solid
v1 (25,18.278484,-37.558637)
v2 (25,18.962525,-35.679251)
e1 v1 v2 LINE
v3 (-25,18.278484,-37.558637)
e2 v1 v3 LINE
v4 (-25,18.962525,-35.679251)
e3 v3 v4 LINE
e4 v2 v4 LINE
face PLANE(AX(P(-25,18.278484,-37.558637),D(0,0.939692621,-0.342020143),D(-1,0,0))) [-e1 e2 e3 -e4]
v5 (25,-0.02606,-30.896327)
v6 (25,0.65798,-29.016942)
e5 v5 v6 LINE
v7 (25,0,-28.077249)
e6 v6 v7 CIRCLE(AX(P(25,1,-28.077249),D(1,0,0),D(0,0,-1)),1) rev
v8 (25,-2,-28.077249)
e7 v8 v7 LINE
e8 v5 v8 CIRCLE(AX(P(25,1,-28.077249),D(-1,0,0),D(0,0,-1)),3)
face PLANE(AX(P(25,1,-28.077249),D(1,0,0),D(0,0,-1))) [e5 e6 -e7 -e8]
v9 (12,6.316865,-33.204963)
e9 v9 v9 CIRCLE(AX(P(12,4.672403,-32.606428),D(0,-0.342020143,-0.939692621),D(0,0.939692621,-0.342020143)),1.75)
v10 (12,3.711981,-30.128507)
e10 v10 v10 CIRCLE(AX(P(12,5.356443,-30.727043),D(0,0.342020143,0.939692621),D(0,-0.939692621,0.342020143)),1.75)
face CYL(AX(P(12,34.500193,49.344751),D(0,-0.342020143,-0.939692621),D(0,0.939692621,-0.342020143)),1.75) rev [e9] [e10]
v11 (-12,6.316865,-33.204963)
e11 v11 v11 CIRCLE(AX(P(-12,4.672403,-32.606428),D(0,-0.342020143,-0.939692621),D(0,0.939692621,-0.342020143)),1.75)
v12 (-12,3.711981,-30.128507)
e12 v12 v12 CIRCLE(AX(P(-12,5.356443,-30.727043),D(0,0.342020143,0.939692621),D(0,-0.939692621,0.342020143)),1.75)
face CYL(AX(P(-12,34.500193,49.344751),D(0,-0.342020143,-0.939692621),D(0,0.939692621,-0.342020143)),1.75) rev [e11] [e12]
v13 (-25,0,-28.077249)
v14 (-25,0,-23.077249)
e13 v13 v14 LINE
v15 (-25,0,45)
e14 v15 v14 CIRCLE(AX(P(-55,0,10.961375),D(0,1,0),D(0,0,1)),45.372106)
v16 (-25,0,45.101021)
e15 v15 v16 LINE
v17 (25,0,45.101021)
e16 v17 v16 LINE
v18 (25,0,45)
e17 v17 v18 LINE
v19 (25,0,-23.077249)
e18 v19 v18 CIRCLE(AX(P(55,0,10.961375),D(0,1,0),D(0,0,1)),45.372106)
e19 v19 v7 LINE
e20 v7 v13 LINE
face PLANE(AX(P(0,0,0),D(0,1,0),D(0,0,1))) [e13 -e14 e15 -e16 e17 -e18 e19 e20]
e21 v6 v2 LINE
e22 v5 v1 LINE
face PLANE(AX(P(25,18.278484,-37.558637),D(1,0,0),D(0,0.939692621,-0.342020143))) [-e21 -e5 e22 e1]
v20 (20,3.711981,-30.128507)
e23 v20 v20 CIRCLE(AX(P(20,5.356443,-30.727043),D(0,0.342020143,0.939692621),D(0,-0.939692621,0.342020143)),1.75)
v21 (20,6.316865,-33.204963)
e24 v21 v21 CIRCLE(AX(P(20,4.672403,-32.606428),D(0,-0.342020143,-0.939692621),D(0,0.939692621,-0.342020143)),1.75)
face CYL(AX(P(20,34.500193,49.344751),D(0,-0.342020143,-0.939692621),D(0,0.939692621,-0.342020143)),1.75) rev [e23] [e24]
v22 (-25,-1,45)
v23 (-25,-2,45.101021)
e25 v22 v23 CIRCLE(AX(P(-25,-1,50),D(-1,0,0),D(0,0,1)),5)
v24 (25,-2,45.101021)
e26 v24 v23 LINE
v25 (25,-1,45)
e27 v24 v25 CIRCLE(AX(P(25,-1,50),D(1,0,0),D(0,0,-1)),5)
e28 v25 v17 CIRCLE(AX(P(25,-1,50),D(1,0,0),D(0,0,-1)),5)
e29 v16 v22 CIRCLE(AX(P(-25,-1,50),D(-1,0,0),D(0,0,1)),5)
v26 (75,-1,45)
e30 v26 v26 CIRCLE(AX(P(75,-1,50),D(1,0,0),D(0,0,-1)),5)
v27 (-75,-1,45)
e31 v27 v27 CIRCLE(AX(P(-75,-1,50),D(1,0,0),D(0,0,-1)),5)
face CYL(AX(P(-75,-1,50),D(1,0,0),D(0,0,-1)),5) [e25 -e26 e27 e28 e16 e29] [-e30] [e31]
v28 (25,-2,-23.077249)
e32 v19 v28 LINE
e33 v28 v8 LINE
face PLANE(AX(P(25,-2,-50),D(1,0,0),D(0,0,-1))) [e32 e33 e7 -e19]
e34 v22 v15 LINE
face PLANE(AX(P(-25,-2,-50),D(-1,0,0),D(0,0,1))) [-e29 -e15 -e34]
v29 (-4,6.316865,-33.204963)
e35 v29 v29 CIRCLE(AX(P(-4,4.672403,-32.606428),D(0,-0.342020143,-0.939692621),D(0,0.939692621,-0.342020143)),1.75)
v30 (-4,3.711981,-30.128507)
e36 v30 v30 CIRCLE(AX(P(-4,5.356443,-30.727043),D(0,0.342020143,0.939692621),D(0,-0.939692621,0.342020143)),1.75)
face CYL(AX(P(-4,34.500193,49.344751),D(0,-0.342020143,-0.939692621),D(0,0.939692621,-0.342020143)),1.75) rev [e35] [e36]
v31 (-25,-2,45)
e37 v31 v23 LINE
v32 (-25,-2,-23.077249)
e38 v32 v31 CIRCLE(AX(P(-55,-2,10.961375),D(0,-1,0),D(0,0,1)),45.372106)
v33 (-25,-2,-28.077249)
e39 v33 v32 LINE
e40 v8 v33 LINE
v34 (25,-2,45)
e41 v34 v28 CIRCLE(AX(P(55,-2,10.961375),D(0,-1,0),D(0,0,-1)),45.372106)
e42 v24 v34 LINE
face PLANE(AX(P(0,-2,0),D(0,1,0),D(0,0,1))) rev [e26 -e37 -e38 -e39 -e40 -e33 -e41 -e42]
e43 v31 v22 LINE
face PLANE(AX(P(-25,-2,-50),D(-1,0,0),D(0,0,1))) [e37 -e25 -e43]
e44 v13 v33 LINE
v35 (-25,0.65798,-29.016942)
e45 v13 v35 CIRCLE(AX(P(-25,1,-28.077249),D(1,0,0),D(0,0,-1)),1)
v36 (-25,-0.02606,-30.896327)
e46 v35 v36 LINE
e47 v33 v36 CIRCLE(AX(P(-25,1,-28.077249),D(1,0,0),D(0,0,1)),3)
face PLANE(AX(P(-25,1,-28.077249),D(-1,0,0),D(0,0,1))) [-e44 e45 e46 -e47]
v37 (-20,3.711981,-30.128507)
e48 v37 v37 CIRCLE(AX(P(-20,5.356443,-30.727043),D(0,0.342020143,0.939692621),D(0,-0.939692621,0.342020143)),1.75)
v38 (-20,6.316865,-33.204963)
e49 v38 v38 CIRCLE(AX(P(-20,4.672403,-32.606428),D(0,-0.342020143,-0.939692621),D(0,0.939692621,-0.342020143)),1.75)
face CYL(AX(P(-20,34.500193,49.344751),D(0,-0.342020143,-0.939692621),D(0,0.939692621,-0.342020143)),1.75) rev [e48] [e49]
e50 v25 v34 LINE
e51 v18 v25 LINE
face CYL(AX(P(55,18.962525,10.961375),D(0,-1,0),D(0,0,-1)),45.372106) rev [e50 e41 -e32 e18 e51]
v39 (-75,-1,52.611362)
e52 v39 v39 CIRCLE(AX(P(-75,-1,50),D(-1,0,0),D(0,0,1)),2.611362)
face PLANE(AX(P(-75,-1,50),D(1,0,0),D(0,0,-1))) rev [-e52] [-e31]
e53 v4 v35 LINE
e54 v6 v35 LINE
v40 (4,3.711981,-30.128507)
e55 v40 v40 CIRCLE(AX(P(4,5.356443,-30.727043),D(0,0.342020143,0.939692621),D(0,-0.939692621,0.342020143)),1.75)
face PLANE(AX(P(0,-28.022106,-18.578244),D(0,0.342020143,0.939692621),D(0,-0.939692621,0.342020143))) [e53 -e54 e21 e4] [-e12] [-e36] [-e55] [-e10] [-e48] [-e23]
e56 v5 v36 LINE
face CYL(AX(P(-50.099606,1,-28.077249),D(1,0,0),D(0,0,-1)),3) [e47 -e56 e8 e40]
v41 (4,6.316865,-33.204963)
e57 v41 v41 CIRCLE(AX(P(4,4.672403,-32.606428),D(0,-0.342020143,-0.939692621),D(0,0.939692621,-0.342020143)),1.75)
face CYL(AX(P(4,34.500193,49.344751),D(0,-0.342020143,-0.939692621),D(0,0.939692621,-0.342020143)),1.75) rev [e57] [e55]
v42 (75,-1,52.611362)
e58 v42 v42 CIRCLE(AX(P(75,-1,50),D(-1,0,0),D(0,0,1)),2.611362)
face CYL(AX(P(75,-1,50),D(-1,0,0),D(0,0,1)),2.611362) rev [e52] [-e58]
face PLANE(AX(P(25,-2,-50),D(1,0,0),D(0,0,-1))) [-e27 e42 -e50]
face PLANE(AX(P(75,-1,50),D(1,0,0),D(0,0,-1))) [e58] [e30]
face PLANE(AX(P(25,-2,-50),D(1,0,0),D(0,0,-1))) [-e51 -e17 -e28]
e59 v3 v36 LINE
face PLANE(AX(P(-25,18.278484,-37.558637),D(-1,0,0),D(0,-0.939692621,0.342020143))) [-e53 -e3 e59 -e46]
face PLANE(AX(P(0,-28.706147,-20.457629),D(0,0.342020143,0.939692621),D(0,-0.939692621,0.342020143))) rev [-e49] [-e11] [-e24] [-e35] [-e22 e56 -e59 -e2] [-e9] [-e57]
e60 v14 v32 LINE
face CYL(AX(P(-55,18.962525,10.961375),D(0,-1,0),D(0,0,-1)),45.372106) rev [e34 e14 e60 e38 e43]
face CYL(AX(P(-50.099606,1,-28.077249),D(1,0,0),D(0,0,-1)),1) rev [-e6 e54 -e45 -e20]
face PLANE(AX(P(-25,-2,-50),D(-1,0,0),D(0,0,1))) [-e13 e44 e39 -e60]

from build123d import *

# Parameters (mm, degrees)
SKETCH1_W                = 50
SKETCH1_H                = 100
BASE_FLANGE1_DEPTH       = 2
SKETCHED_START           = -25
SKETCHED_BEND1_DEPTH     = 50
SKETCHED_BEND1_2_DEPTH   = 50
CUT_EXTRUDE2_DEPTH       = 60.702826072
BOSS_EXTRUDE2_DEPTH      = 75
BOSS_EXTRUDE2_DEPTH_BACK = 75
SKETCH9_R                = 5
SKETCH10_R               = 1.75
CUT_EXTRUDE3_DEPTH       = 116.029027735
SKETCH11_R               = 2.61136214
CUT_EXTRUDE4_DEPTH       = 161.886846393


# Read off the part's stored shape, not the designer's step: Sketched Bend1
# Sheet-metal steps are written as plain solids
with BuildPart() as part:
    # Sketch1 → Base-Flange1 (new body)
    with BuildSketch(Plane(origin=(0, 0, 0), x_dir=(1, 0, 0), z_dir=(0, 1, 0))):
        Rectangle(SKETCH1_W, SKETCH1_H)
    extrude(amount=-BASE_FLANGE1_DEPTH)

    # Sketched Bend1 outline → Sketched Bend1 (cut)
    with BuildSketch(Plane.YZ.offset(SKETCHED_START)):
        with BuildLine():
            Line((0, -50), (0, -30.905812394))
            Line((0, -30.905812394), (-0.02606043, -30.896327173))
            ThreePointArc((-0.02606043, -30.896327173), (-1.457456133, -29.79797862), (-2, -28.077249311))
            Line((-2, -28.077249311), (-2, -50))
            Line((-2, -50), (0, -50))
        make_face()
    extrude(amount=SKETCHED_BEND1_DEPTH, mode=Mode.SUBTRACT)

    # Sketched Bend1 2 outline → Sketched Bend1 2 (add)
    with BuildSketch(Plane.YZ.offset(SKETCHED_START)):
        with BuildLine():
            Line((0, -30.905812394), (18.278484393, -37.558636641))
            Line((18.278484393, -37.558636641), (18.96252468, -35.679251399))
            Line((18.96252468, -35.679251399), (0.657979857, -29.016941932))
            ThreePointArc((0.657979857, -29.016941932), (0.180847956, -28.650825747), (0, -28.077249311))
            Line((0, -28.077249311), (0, -30.905812394))
        make_face()
    extrude(amount=SKETCHED_BEND1_2_DEPTH)

    # Sketch8 → Cut-Extrude2 (cut, through all)
    with BuildSketch(Plane.XZ.offset(2)):
        with BuildLine():
            Line((-25, 45), (-25, -23.077249311))
            ThreePointArc((-25, -23.077249311), (-9.62789438, 10.961375345), (-25, 45))
        make_face()
        with BuildLine():
            Line((25, -23.077249311), (25, 45))
            ThreePointArc((25, 45), (9.62789438, 10.961375345), (25, -23.077249311))
        make_face()
    extrude(amount=-CUT_EXTRUDE2_DEPTH, mode=Mode.SUBTRACT)

    # Sketch9 → Boss-Extrude2 (add, two sides: drawn at the far end of the back side and taken through both)
    with BuildSketch(Plane(origin=(0, 0, 0), x_dir=(0, 0, -1), z_dir=(1, 0, 0)).offset(-BOSS_EXTRUDE2_DEPTH_BACK)):
        with Locations((-50, -1)):
            Circle(SKETCH9_R)
    extrude(amount=BOSS_EXTRUDE2_DEPTH + BOSS_EXTRUDE2_DEPTH_BACK)

    # Sketch10 → Cut-Extrude3 (cut, through all)
    with BuildSketch(Plane(origin=(0, -9.932936637, -27.290519119), x_dir=(-1, 0, 0), z_dir=(0, -0.34202014332566616, -0.9396926207859094))):
        with Locations(Location((-20, 15.542677454, 0), (0, 0, 90))):
            Circle(SKETCH10_R)
        with Locations(Location((-12, 15.542677454, 0), (0, 0, 90))):
            Circle(SKETCH10_R)
        with Locations(Location((-4, 15.542677454, 0), (0, 0, 90))):
            Circle(SKETCH10_R)
        with Locations(Location((4, 15.542677454, 0), (0, 0, 90))):
            Circle(SKETCH10_R)
        with Locations(Location((12, 15.542677454, 0), (0, 0, 90))):
            Circle(SKETCH10_R)
        with Locations(Location((20, 15.542677454, 0), (0, 0, 90))):
            Circle(SKETCH10_R)
    extrude(amount=-CUT_EXTRUDE3_DEPTH, mode=Mode.SUBTRACT)

    # Sketch11 → Cut-Extrude4 (cut, through all)
    with BuildSketch(Plane.ZY.offset(75)):
        with Locations((50, -1)):
            Circle(SKETCH11_R)
    extrude(amount=-CUT_EXTRUDE4_DEPTH, mode=Mode.SUBTRACT)


solid = part.part
